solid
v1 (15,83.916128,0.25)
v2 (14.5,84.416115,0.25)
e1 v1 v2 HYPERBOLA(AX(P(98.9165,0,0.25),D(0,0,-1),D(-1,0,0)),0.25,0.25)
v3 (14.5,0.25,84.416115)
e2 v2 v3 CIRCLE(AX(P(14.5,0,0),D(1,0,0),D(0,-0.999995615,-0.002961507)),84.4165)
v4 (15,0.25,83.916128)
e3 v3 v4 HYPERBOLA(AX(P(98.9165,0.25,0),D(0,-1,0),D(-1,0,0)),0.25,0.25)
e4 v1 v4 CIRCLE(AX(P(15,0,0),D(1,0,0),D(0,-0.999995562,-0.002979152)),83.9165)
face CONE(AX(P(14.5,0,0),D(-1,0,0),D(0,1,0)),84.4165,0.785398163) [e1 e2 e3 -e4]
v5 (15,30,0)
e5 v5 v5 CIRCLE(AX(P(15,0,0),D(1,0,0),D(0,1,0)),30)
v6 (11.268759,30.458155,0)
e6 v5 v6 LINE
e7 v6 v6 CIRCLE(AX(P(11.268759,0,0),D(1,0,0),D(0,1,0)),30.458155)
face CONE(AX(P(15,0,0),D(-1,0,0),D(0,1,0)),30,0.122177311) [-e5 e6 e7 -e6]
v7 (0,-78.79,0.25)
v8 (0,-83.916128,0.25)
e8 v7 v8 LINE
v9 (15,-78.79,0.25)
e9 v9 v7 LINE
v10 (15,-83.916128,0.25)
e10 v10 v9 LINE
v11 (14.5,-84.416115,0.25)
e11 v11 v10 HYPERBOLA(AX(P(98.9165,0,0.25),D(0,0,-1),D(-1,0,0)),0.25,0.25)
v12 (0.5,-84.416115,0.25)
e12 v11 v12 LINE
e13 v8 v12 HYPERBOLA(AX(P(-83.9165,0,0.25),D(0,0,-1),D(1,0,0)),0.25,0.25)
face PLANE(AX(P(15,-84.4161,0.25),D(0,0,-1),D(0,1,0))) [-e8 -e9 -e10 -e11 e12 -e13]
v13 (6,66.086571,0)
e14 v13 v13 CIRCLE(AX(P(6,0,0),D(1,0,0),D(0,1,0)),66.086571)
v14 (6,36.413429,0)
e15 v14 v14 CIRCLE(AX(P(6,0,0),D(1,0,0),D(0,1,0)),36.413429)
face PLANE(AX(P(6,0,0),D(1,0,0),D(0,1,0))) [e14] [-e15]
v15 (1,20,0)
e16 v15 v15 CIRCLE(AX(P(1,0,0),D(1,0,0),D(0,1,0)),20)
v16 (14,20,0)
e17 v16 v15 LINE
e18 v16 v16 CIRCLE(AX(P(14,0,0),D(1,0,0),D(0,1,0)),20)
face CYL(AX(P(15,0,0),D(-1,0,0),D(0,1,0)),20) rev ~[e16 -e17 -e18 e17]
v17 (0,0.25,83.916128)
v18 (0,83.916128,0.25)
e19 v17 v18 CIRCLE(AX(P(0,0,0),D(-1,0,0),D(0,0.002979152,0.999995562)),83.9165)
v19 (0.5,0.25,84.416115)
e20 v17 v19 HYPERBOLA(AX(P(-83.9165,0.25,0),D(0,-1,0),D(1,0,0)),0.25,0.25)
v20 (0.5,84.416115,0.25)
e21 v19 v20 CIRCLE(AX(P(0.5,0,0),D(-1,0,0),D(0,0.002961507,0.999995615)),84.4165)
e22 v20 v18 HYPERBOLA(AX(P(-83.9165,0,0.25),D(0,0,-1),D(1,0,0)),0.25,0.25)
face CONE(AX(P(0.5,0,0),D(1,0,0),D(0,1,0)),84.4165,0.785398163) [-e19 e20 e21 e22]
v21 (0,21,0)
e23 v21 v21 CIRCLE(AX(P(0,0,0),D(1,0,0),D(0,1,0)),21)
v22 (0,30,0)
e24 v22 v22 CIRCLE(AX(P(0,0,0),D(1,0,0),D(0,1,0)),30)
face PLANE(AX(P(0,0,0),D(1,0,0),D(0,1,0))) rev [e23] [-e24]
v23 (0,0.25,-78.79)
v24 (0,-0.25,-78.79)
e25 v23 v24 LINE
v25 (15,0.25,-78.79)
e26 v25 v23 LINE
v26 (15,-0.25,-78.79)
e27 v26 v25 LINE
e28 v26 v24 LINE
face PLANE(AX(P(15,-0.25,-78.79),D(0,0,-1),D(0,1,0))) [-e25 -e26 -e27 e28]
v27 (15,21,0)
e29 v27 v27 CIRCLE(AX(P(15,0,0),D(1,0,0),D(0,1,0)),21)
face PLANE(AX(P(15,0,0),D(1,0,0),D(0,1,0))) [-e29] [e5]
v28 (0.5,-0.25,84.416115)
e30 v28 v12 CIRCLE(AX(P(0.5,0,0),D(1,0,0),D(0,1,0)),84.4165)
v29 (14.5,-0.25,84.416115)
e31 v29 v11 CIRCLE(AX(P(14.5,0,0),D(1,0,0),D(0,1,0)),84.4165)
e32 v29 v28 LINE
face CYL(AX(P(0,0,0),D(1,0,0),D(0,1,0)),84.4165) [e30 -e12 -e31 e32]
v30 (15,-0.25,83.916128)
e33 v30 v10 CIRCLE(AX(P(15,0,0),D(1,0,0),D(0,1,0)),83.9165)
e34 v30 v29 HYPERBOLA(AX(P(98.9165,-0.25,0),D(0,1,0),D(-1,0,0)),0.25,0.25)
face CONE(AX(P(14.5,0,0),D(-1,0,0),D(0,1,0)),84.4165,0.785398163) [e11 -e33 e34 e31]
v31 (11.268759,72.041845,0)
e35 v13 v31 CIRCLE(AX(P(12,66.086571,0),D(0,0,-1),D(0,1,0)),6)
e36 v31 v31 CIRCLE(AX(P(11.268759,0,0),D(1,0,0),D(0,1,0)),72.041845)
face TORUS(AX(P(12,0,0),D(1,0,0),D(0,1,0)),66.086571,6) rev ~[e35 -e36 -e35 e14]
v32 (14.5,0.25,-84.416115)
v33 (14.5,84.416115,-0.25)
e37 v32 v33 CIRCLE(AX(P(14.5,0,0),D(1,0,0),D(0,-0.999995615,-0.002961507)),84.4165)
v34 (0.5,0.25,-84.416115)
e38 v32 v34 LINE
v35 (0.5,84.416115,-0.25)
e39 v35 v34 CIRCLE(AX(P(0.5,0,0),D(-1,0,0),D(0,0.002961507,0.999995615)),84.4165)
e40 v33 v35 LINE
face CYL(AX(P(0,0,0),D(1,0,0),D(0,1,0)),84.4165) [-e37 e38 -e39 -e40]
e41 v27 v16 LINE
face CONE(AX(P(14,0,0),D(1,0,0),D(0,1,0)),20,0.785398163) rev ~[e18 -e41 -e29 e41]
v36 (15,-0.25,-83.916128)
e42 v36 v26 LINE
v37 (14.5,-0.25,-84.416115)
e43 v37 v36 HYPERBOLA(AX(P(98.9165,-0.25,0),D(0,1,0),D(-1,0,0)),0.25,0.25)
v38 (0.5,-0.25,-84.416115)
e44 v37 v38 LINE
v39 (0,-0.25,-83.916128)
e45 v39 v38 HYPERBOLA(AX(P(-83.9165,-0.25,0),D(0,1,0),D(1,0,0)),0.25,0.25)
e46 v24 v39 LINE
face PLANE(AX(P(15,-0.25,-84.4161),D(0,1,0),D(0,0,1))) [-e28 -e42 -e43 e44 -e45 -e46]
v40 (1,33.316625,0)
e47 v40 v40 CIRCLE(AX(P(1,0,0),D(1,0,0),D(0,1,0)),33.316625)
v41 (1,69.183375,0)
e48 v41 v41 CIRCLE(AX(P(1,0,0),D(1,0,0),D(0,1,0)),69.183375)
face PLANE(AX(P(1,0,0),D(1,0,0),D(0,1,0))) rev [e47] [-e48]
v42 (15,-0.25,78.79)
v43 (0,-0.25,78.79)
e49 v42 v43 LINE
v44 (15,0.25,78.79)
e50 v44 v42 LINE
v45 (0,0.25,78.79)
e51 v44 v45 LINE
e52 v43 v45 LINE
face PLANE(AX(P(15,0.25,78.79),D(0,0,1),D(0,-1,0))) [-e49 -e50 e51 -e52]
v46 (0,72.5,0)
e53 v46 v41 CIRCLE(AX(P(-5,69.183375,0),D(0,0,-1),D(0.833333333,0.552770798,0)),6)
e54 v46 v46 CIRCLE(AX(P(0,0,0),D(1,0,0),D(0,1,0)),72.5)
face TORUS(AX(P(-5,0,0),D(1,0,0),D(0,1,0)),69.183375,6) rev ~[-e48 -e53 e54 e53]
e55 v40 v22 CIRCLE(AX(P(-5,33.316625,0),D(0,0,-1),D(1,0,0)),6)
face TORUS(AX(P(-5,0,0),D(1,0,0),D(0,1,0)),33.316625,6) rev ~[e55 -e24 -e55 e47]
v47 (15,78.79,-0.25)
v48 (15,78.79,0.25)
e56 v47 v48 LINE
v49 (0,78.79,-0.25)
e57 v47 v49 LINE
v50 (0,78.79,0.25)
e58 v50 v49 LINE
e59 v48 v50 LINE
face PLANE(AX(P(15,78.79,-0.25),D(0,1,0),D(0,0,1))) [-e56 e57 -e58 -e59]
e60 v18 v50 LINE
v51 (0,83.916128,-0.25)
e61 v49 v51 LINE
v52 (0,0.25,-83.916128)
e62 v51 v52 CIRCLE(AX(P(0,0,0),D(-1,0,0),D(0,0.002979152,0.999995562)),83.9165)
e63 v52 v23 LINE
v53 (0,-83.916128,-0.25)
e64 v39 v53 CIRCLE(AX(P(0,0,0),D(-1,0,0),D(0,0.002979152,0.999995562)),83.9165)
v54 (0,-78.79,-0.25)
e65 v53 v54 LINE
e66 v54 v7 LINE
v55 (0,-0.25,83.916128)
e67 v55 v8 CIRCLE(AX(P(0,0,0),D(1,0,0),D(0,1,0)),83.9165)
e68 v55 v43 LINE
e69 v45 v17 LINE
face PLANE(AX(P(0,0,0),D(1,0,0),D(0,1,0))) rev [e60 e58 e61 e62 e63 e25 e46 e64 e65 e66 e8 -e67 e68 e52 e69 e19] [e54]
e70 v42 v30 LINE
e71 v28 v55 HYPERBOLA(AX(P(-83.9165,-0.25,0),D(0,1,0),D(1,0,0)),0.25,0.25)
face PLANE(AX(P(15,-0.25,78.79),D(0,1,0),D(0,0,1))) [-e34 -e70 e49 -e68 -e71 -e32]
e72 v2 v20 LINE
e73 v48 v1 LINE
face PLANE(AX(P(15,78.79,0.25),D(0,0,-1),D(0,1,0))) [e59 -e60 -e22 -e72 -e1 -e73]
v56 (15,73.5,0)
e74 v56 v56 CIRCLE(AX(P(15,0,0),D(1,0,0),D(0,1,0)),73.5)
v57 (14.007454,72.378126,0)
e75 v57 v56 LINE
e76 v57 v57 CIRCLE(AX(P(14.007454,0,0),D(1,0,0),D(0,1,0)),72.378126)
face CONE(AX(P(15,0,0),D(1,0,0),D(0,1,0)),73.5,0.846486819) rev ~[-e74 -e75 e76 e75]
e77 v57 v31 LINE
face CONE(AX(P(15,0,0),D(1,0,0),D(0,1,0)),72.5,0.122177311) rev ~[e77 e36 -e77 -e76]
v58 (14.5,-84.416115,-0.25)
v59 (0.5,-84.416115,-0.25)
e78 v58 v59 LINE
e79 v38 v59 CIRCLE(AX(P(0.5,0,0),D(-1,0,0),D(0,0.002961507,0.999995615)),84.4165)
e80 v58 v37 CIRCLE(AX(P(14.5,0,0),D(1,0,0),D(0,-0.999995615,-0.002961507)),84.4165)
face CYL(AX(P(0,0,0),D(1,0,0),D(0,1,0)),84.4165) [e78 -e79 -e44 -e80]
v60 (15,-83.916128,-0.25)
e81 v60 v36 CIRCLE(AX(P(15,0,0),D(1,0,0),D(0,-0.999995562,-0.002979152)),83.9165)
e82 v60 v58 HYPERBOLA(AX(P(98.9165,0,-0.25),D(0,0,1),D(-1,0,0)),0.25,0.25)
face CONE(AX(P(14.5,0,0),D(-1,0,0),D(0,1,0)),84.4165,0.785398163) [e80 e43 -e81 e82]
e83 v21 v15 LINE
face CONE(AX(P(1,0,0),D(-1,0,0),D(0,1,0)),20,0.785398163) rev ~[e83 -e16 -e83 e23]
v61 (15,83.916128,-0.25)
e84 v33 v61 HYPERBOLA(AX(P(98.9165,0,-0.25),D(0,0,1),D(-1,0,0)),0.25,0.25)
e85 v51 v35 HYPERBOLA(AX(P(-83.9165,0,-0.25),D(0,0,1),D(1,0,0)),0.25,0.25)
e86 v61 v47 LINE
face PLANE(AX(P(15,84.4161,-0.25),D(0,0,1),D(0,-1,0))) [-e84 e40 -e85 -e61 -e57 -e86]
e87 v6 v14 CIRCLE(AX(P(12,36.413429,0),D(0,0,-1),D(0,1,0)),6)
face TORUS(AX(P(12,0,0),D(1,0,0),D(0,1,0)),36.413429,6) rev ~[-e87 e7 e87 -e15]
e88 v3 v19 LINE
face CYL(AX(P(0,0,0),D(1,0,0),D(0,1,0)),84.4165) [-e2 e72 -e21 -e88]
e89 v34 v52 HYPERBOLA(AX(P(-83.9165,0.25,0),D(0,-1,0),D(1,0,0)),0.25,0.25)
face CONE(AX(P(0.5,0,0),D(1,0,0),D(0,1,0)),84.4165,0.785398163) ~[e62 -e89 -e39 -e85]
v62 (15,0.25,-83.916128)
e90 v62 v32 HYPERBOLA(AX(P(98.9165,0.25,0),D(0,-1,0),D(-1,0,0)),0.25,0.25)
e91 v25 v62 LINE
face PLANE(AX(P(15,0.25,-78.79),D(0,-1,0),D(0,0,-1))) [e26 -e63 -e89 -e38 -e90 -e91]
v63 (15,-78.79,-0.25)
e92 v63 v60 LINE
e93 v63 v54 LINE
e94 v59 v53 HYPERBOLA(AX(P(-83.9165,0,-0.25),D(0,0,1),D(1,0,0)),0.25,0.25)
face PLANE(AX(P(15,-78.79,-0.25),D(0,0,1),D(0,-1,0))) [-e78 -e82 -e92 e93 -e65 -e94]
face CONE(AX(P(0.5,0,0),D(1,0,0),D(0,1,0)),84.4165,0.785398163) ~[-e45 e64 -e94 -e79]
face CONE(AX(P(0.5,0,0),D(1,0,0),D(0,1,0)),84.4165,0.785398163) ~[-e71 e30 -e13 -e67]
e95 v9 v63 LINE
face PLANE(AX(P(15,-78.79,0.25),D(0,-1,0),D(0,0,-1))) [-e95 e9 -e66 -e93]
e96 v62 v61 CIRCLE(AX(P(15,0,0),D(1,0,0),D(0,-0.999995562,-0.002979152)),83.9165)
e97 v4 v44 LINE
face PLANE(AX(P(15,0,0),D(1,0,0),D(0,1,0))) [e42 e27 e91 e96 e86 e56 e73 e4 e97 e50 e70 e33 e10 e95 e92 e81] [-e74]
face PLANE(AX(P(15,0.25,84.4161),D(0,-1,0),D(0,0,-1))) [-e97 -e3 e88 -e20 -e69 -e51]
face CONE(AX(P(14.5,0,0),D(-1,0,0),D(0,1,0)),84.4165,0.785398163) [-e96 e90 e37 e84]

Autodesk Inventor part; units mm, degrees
ref_plane "YZ Plane" through (0, 0, 0) normal (1, 0, 0) x (0, 1, 0)
ref_plane "XZ Plane" through (0, 0, 0) normal (0, 1, 0) x (-1, 0, 0)
ref_plane "XY Plane" through (0, 0, 0) normal (0, 0, 1) x (1, 0, 0)
sketch "Эскиз1" plane through (0, 0, 0) normal (0, 0, 1) x (1, 0, 0)
  line L0 (0, 20) -> (0, 30)
  line L1 (1, 30.1228) -> (1, 72.3772)
  line L2 (0, 72.5) -> (0, 84.4165)
  line L3 (0, 84.4165) -> (15, 84.4165)
  line L4 (6, 71.3949) -> (6, 31.1051)
  line L5 (15, 20) -> (0, 20)
  line L6 (15, 30) -> (15, 20)
  line L7 (-3, 0) -> (18, 0) construction
  line L8 (0, -16.8833) -> (0, 101.2998) construction
  line L9 (15, 84.4165) -> (15, 72.5)
  line L10 (15, 72.5) -> (6, 71.3949)
  line L11 (15, 30) -> (6, 31.1051)
  line L12 (0, 30) -> (1, 30.1228)
  line L13 (0, 72.5) -> (1, 72.3772)
  point P0 (0, 0)
  point P1 (1, 77.4165)
  point P2 (7, 77.4165)
  point P3 (7, 28)
  dimension "d0" = 15
  dimension "d2" = 5
  dimension "d5" = 40
  dimension "d7" = 168.833
  dimension "d9" = 0
  dimension "d17" = 83
  dimension "d18" = 83
  dimension "d19" = 60
  dimension "d20" = 83
  dimension "d21" = 83
  dimension "d22" = 2
  dimension "d43" = 145
revolve "Вращение1" add sketch "Эскиз1" angle 360 about axis through (-10, 0, 0) along (1, 0, 0)
chamfer "Фаска1" distance 1 angle 45 2 edges at (15, -20, 0) (0, -20, 0)
fillet "Сопряжение3" radius 6 2 edges at (6, -71.3949, 0) (6, -31.1051, 0)
chamfer "Фаска2" distance 1 angle 45 1 edges at (15, -72.5, 0)
fillet "Сопряжение4" radius 6 2 edges at (1, -30.1228, 0) (1, -72.3772, 0)
chamfer "Фаска4" distance 0.5 angle 45 2 edges at (0, -84.4165, 0) (15, -84.4165, 0)
sketch "Эскиз2" plane through (15, 0, 0) normal (1, 0, 0) x (0, 0, -1)
  circle A0 centre (0, 0) radius 84.4165 projected
  circle A1 centre (0, 0) radius 73.5 projected
  circle A2 centre (0, 0) radius 84.4165 projected
  line L0 (-84.4161, 0.25) -> (-78.79, 0.25)
  line L1 (-78.79, 0.25) -> (-78.79, -0.25)
  line L2 (-78.79, -0.25) -> (-84.4161, -0.25)
  line L3 (0, -118.1831) -> (0, 118.1831) projected
  line L4 (118.1831, 0) -> (-118.1831, 0) projected
  dimension "d33" = 78.79
  dimension "d34" = 0.5
extrude "Выдавливание1" cut sketch "Эскиз2" against normal through all contours L0 L1 L4 A0 | A0 L4 L1 L2
pattern_circular "Круговой массив1" count 4 over 360 about axis through (-10, 0, 0) along (1, 0, 0) of "Выдавливание1"
properties part number "Wheel"
